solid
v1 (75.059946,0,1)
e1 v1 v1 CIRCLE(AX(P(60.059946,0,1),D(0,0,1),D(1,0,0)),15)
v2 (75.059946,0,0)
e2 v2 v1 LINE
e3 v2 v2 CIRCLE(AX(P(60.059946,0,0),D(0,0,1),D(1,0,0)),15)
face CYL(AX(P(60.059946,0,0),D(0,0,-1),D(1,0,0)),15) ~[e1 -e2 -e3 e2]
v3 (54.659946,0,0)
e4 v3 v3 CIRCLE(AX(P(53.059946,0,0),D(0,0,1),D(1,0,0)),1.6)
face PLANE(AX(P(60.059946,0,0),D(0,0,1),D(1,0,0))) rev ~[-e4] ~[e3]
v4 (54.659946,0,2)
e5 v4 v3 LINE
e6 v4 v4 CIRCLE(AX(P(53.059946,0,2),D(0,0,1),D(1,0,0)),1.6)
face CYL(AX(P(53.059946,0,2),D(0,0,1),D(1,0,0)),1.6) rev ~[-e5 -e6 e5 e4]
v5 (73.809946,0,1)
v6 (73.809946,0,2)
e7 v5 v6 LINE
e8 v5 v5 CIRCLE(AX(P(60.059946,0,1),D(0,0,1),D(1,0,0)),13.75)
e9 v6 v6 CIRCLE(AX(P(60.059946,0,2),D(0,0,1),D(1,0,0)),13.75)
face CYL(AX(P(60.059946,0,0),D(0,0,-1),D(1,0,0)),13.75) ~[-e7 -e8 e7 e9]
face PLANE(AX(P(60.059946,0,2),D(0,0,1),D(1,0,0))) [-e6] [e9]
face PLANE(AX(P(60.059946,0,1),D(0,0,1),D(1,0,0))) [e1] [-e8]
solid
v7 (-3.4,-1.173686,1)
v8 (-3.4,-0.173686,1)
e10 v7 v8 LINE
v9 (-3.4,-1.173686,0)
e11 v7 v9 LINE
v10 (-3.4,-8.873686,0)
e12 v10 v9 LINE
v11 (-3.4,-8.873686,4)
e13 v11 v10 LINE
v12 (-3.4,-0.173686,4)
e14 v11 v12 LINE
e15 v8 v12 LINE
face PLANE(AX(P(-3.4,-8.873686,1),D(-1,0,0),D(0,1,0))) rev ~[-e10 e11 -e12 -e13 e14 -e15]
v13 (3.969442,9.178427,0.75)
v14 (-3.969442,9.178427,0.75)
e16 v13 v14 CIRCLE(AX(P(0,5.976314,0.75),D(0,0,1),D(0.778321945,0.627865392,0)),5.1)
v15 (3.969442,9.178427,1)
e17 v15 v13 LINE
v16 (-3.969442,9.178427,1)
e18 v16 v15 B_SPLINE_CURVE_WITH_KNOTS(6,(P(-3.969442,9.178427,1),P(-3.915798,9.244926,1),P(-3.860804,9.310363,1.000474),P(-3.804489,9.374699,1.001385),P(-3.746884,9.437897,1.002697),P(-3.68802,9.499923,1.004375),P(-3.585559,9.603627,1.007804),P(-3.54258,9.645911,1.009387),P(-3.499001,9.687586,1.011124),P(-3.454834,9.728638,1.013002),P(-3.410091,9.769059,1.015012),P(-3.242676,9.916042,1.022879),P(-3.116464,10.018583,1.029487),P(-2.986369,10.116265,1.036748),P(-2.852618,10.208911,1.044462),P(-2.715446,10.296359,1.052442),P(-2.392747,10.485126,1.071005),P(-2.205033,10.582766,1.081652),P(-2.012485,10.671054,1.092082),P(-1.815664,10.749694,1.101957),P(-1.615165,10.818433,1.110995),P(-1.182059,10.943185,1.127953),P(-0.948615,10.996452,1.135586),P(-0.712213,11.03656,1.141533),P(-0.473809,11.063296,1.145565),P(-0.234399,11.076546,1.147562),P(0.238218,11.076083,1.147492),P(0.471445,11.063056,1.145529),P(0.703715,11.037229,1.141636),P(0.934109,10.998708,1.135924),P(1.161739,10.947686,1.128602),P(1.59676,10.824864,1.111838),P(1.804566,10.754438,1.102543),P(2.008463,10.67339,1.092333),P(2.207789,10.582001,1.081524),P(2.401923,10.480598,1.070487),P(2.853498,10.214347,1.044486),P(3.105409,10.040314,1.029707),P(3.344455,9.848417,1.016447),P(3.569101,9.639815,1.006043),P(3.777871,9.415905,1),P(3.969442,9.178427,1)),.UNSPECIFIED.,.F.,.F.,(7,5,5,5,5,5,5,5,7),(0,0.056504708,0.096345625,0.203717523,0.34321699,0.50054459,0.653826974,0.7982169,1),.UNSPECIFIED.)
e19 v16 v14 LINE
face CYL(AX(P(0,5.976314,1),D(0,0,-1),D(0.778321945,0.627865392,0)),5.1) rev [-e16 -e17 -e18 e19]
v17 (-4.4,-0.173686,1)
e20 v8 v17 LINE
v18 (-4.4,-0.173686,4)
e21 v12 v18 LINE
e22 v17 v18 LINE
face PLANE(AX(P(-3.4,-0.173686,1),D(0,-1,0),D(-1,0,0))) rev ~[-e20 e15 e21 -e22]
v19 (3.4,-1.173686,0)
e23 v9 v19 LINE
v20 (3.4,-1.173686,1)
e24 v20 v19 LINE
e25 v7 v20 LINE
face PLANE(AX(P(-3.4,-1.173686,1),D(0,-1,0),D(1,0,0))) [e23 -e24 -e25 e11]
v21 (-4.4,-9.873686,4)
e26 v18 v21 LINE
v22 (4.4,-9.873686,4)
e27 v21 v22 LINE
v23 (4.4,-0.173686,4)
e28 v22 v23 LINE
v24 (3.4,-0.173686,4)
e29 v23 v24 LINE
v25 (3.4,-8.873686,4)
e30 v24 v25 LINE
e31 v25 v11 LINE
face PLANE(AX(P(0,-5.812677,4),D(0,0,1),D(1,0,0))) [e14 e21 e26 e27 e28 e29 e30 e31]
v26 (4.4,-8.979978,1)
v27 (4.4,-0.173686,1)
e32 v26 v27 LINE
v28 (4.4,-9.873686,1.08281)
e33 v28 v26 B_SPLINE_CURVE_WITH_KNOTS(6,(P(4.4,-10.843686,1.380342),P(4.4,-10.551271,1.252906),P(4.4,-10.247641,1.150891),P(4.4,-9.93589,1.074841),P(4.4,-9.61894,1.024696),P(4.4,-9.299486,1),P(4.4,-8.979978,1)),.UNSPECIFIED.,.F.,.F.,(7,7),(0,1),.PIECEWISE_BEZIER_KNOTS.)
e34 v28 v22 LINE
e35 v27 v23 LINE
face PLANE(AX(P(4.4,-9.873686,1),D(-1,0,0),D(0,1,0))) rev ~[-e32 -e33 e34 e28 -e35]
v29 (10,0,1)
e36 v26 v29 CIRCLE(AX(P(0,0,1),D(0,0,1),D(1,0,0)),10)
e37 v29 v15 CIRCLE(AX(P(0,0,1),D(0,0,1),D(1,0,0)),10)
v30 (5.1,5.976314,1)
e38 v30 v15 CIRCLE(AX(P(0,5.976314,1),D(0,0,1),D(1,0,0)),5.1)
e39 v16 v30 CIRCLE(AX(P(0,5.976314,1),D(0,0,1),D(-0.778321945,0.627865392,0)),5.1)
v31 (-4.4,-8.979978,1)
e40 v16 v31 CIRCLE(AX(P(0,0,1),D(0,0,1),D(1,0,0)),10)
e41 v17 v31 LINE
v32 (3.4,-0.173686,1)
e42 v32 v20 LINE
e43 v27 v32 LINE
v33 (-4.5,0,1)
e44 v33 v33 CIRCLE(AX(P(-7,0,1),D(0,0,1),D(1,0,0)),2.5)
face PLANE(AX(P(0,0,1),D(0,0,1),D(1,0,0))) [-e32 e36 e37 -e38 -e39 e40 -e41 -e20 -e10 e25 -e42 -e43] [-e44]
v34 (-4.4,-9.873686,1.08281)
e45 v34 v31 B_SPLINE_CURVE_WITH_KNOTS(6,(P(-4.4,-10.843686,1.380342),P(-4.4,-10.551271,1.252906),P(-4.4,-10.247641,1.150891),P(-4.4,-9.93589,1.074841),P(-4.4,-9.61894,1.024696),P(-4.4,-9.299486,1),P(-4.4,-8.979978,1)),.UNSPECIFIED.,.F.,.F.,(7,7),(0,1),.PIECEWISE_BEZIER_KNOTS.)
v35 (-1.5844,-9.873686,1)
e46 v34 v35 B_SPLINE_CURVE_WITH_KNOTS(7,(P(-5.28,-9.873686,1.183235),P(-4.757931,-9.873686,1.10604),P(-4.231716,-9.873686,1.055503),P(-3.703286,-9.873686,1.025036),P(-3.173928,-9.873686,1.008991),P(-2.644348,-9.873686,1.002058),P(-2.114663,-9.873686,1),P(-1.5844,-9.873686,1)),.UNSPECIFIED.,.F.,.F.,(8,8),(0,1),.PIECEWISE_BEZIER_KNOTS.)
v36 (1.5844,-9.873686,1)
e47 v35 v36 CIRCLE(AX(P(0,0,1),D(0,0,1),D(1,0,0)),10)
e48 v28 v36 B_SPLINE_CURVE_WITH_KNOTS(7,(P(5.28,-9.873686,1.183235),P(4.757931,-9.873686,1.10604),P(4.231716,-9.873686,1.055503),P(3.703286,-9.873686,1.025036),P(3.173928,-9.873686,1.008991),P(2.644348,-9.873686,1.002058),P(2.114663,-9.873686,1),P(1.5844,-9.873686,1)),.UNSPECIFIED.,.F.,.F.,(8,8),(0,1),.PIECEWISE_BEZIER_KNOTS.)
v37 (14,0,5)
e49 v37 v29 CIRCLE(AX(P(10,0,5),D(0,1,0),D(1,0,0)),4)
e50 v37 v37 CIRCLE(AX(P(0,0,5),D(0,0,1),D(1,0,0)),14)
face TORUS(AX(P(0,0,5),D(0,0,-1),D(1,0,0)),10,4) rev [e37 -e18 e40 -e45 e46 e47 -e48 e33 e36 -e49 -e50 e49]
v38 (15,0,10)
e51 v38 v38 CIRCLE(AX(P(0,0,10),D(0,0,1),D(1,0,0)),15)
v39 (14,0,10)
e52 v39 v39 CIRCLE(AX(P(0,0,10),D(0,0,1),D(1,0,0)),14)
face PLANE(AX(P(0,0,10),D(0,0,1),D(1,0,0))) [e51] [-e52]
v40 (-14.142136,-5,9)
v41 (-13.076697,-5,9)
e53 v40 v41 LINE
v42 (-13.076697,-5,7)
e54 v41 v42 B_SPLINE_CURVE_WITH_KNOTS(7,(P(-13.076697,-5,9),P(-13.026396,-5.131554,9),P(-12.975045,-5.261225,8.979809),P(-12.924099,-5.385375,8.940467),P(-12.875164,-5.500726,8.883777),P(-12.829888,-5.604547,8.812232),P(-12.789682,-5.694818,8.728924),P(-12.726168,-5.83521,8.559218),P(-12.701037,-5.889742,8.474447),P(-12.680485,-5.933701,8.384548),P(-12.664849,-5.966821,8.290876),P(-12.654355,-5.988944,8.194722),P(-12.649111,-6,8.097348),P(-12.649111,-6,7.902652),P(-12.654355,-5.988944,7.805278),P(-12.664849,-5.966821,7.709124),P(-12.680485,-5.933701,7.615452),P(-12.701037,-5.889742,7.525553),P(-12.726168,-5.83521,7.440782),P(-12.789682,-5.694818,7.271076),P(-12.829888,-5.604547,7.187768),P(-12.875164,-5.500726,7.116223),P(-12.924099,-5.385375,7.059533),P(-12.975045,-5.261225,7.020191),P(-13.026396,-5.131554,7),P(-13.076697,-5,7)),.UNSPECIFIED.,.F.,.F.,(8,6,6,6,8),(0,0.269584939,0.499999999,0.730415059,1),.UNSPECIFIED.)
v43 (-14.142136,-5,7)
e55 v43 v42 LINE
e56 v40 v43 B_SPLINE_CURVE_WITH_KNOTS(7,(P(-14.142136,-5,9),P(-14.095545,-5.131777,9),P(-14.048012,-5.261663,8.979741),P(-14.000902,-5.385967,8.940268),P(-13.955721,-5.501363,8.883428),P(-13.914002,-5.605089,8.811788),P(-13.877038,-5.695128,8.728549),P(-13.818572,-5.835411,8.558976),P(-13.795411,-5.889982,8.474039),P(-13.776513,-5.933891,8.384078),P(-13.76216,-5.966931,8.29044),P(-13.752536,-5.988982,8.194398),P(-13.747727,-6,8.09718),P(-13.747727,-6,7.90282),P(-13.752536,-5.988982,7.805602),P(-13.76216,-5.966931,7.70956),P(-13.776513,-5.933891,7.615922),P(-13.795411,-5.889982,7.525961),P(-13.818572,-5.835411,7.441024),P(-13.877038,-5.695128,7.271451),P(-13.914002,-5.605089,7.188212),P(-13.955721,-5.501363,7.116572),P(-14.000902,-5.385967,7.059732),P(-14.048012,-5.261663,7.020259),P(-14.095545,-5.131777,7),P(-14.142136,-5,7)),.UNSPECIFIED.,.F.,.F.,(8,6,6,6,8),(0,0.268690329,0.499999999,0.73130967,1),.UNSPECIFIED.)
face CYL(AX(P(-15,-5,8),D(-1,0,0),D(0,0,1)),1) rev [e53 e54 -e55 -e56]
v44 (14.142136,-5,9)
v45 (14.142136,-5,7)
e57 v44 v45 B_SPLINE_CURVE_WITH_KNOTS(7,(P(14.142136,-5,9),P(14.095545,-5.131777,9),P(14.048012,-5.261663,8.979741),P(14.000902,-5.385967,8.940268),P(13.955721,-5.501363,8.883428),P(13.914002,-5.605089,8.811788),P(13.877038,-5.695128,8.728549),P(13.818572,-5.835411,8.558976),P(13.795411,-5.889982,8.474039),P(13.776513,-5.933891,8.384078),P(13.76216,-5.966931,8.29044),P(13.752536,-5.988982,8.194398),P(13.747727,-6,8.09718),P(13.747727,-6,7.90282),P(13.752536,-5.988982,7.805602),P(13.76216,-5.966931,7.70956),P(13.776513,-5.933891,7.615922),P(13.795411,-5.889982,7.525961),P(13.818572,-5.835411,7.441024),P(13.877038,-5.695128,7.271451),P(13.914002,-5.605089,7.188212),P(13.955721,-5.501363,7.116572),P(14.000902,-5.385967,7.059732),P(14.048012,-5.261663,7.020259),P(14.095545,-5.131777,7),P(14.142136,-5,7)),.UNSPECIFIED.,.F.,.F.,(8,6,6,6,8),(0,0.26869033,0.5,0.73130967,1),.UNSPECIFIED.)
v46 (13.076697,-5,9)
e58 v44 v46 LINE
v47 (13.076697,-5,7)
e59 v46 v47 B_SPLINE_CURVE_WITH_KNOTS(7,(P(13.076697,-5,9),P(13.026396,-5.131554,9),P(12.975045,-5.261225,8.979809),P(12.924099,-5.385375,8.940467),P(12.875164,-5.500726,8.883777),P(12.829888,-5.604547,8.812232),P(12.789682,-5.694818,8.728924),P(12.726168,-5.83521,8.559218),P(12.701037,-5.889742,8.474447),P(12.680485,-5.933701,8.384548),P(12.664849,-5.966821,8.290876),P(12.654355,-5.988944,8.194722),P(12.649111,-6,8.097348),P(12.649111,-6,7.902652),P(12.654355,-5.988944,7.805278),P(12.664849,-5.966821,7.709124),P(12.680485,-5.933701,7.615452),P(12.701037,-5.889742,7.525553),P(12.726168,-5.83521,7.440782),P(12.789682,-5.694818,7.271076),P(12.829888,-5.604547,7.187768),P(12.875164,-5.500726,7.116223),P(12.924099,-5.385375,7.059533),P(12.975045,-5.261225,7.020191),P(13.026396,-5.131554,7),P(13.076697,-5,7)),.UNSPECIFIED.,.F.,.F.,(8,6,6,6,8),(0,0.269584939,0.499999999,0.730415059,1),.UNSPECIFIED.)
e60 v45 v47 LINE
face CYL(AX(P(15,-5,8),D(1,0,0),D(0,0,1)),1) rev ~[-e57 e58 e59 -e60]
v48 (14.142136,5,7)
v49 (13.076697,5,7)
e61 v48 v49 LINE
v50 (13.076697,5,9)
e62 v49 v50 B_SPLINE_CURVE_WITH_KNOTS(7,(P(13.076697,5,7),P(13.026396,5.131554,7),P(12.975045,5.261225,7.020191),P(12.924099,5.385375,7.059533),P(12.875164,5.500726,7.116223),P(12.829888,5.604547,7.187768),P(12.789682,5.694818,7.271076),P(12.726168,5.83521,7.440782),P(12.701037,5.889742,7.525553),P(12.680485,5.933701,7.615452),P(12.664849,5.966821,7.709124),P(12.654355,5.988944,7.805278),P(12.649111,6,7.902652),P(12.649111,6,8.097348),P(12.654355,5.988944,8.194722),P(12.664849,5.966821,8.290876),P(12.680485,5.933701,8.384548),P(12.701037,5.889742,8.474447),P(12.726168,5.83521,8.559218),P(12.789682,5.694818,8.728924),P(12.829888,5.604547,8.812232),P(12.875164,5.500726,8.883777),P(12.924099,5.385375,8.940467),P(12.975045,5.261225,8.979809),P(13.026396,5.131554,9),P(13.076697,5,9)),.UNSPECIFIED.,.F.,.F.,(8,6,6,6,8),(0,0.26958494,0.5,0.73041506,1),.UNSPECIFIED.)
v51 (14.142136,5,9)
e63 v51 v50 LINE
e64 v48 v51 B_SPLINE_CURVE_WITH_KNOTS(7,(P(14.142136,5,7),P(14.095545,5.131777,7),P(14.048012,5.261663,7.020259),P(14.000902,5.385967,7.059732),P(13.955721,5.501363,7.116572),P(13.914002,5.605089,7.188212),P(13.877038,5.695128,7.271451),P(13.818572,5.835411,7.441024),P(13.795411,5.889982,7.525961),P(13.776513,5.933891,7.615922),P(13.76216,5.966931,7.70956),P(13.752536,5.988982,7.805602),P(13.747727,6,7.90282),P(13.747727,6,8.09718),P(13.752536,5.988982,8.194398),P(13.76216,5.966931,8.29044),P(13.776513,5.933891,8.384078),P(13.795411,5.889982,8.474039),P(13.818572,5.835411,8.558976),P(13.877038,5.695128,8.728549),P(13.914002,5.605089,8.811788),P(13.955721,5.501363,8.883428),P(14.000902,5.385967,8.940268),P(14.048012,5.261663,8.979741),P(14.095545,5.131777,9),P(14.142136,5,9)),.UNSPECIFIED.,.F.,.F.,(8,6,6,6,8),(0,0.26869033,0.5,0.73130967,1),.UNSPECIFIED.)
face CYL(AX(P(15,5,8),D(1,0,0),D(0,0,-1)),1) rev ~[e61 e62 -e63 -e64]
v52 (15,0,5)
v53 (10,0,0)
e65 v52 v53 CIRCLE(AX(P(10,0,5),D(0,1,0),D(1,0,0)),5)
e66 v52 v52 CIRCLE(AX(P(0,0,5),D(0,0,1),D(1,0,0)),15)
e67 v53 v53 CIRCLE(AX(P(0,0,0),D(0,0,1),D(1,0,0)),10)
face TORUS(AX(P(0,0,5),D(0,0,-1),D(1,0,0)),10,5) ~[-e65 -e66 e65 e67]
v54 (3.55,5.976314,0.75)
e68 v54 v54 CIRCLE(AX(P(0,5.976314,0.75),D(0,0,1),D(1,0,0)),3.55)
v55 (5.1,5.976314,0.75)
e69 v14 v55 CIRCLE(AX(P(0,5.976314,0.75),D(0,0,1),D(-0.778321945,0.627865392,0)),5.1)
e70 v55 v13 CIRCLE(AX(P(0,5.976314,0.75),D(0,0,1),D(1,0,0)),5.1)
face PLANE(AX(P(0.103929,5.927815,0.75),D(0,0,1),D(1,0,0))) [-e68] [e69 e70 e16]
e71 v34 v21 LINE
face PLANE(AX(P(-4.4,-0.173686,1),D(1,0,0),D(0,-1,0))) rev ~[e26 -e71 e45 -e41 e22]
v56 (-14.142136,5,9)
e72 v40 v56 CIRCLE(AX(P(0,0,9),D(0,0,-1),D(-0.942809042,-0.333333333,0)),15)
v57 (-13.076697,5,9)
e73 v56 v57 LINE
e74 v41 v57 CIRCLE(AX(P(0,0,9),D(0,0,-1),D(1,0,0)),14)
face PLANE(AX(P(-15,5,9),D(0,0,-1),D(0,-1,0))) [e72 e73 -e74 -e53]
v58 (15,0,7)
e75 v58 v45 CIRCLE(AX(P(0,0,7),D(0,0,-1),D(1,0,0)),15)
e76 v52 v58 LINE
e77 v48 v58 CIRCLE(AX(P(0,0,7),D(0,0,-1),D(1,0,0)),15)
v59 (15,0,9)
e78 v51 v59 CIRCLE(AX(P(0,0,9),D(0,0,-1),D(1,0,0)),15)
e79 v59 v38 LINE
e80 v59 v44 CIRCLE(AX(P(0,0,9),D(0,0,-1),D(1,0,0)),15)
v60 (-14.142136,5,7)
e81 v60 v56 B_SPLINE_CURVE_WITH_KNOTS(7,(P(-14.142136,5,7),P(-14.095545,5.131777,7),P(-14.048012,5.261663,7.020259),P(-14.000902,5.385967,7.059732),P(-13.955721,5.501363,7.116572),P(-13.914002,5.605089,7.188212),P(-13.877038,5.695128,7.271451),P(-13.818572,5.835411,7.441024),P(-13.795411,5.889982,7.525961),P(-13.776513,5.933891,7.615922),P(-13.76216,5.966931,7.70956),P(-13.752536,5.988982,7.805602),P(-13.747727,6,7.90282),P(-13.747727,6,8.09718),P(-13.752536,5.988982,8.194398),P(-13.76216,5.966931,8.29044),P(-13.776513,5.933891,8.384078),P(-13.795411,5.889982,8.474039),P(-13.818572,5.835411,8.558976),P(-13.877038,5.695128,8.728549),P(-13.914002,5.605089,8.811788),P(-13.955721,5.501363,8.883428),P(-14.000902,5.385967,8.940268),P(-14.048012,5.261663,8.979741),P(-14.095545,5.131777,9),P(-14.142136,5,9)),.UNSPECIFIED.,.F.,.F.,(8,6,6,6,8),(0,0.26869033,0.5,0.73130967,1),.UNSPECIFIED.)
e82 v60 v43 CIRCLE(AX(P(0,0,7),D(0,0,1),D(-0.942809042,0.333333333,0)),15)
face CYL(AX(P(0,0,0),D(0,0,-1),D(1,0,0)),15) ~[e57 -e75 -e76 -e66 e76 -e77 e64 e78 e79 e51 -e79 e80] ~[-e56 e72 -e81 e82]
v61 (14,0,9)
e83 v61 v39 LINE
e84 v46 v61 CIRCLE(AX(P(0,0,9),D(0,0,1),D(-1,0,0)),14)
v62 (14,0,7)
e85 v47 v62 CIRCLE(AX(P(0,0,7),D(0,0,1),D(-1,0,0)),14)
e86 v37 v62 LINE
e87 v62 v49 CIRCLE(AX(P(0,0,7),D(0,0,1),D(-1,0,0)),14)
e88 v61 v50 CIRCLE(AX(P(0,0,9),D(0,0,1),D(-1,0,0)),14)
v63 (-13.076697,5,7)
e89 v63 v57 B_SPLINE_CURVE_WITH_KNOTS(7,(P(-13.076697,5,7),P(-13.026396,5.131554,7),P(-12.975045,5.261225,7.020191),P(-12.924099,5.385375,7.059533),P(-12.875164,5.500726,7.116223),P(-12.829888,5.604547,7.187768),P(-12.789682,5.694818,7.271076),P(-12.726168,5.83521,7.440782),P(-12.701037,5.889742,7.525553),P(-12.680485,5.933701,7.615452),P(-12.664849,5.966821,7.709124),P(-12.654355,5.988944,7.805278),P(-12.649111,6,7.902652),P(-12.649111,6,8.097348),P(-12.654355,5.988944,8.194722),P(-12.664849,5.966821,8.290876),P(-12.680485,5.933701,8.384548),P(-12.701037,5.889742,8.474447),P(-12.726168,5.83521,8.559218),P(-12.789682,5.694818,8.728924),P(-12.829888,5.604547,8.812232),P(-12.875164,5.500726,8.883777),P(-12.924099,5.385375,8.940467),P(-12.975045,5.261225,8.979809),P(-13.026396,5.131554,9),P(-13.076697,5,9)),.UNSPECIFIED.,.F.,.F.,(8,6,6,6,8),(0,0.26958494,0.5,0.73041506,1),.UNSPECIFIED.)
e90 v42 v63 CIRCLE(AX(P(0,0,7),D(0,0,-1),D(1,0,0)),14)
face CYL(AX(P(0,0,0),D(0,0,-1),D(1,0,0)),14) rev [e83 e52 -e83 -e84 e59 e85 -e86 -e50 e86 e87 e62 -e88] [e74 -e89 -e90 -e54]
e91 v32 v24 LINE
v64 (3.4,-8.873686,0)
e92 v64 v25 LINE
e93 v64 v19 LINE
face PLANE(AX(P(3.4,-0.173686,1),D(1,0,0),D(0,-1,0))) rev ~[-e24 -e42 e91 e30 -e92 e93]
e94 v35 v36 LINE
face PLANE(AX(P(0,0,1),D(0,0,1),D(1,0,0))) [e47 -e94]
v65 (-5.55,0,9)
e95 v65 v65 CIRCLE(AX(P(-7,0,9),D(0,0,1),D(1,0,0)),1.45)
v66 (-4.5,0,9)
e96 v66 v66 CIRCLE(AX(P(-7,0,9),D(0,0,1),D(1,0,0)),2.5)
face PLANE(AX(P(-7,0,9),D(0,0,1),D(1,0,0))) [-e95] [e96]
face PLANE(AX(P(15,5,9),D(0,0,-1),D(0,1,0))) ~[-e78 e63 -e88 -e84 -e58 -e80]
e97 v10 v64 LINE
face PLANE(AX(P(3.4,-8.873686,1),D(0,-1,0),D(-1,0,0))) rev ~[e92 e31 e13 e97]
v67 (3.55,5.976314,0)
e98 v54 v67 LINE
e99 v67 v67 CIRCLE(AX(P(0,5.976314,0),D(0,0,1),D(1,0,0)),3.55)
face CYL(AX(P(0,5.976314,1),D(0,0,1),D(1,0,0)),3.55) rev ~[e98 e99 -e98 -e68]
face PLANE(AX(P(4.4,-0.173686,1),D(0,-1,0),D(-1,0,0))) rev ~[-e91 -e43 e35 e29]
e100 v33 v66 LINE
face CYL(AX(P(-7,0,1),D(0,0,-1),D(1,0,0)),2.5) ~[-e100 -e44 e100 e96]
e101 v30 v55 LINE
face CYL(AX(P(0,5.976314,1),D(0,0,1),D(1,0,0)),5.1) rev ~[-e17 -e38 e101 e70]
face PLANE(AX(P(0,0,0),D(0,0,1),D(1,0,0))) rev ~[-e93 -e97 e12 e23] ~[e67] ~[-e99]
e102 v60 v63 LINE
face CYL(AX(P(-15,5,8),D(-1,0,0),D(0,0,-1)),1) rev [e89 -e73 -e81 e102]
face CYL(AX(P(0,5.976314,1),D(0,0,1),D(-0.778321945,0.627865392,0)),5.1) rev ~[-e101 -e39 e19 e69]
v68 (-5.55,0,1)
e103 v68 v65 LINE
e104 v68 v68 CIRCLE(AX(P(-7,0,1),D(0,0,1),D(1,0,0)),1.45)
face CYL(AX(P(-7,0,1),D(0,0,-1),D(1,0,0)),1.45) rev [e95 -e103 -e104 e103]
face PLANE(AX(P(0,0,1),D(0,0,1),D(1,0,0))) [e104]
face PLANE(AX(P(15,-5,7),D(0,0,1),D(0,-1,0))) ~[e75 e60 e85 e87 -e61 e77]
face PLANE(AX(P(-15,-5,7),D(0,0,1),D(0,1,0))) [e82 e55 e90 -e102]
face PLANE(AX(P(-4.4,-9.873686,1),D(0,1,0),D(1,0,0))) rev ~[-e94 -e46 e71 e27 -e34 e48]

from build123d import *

# Parameters (mm, degrees)
F0_R      = 15
F1_DEPTH  = 10
F2_R      = 5
F3_T      = -1
F4_W      = 6.8
F4_H      = 7.7
F4_R      = 3.55
F5_DEPTH  = 1
F6_DEPTH  = 0.25
F7_DEPTH  = 3
F8_R      = 2.5
F8_R_2    = 1.45
F9_DEPTH  = 8
F12_REACH = 42.1665250606
F13_R     = 13.75
F14_DEPTH = 2
F13_R_2   = 15
F15_DEPTH = 1
F16_R     = 1.6
F17_DEPTH = 2


# Not quite as in the source:
# - a pattern or mirror of a feature is missing from the dataset's text; its kind, count and spacing are read off the source's solid


with BuildPart() as f1:
    # F0 (on Top) → F1 (new body)
    with BuildSketch(Plane.XY):
        Circle(F0_R)
    extrude(amount=F1_DEPTH)

    # F2
    f2_edges = [f1.edges().sort_by_distance(p)[0] for p in [
        (-15, 0, 0),
    ]]
    fillet(f2_edges, radius=F2_R)

    # F3
    f3_openings = [f1.faces().sort_by_distance(p)[0] for p in [
        (0, 0, 10),
    ]]
    offset(amount=F3_T, openings=f3_openings)

    # F4 (on face) → F5 (cut, through all)
    with BuildSketch(Plane.XY.offset(1)):
        with Locations((0, -5.0236860273)):
            Rectangle(F4_W, F4_H)
        with Locations((0, 5.9763139727)):
            Circle(F4_R)
    extrude(amount=-F5_DEPTH, mode=Mode.SUBTRACT)

    # F4 (on face) → F6 (cut, symmetric)
    with BuildSketch(Plane.XY.offset(1)):
        with BuildLine():
            ThreePointArc((-3.9694419174, 9.1784274723), (-1.6979172862, 1.1672520174), (5.1, 5.9763139727))
            ThreePointArc((5.1, 5.9763139727), (4.8090619552, 7.6742312589), (3.9694419174, 9.1784274723))
            ThreePointArc((3.9694419174, 9.1784274723), (0, 10), (-3.9694419174, 9.1784274723))
        make_face()
        with Locations((0, 5.9763139727)):
            Circle(F4_R, mode=Mode.SUBTRACT)
        with BuildLine():
            ThreePointArc((-3.9694419174, 9.1784274723), (0, 10), (3.9694419174, 9.1784274723))
            ThreePointArc((3.9694419174, 9.1784274723), (0, 11.0763139727), (-3.9694419174, 9.1784274723))
        make_face()
    extrude(amount=F6_DEPTH, both=True, mode=Mode.SUBTRACT)

    # F4 (on face) → F7 (join)
    with BuildSketch(Plane.XY.offset(1)):
        with BuildLine():
            Line((-4.4, -0.1736860273), (-4.4, -8.9799777283))
            ThreePointArc((-4.4, -8.9799777283), (-3.0253826694, -9.5313723935), (-1.5844002758, -9.8736860273))
            Line((-1.5844002758, -9.8736860273), (1.5844002758, -9.8736860273))
            ThreePointArc((1.5844002758, -9.8736860273), (3.0253826694, -9.5313723935), (4.4, -8.9799777283))
            Line((4.4, -8.9799777283), (4.4, -0.1736860273))
            Line((4.4, -0.1736860273), (3.4, -0.1736860273))
            Line((3.4, -0.1736860273), (3.4, -1.1736860273))
            Line((3.4, -1.1736860273), (3.4, -8.8736860273))
            Line((3.4, -8.8736860273), (-3.4, -8.8736860273))
            Line((-3.4, -8.8736860273), (-3.4, -1.1736860273))
            Line((-3.4, -1.1736860273), (-3.4, -0.1736860273))
            Line((-3.4, -0.1736860273), (-4.4, -0.1736860273))
        make_face()
        with BuildLine():
            ThreePointArc((-1.5844002758, -9.8736860273), (-3.0253826694, -9.5313723935), (-4.4, -8.9799777283))
            Line((-4.4, -8.9799777283), (-4.4, -9.8736860273))
            Line((-4.4, -9.8736860273), (-1.5844002758, -9.8736860273))
        make_face()
        with BuildLine():
            Line((4.4, -9.8736860273), (4.4, -8.9799777283))
            ThreePointArc((4.4, -8.9799777283), (3.0253826694, -9.5313723935), (1.5844002758, -9.8736860273))
            Line((1.5844002758, -9.8736860273), (4.4, -9.8736860273))
        make_face()
    extrude(amount=F7_DEPTH)

    # F8 (on face) → F9 (join)
    with BuildSketch(Plane.XY.offset(1)):
        with Locations((-7, 0)):
            Circle(F8_R)
        with Locations((-7, 0)):
            Circle(F8_R_2, mode=Mode.SUBTRACT)
    extrude(amount=F9_DEPTH)

    f12_end = f1.faces().sort_by_distance((-14, 0, 7.5))[0]
    # F11 (on offset) → F12 (cut, up to a face of the model that its end follows)
    with BuildSketch(Plane.YZ.offset(-15)):
        with BuildLine():
            Line((-5, 7), (5, 7))
            ThreePointArc((5, 7), (6, 8), (5, 9))
            Line((5, 9), (-5, 9))
            ThreePointArc((-5, 9), (-6, 8), (-5, 7))
        make_face()
    f12_long = extrude(amount=F12_REACH, mode=Mode.PRIVATE)
    f12 = split(f12_long, bisect_by=f12_end, keep=Keep.ALL, mode=Mode.PRIVATE).solids().sort_by_distance((-15, 0, 8))[0]
    add(f12, mode=Mode.SUBTRACT)

    # F12_copies: F12 across plane
    add(f12.mirror(Plane(origin=(0, 0, 0), x_dir=(0, 0, 1), z_dir=(1, 0, 0))), mode=Mode.SUBTRACT)


with BuildPart() as f14:
    # F13 (on Top) → F14 (new body)
    with BuildSketch(Plane.XY):
        with Locations((60.0599460304, 0)):
            Circle(F13_R)
    extrude(amount=F14_DEPTH)

    # F13 (on Top) → F15 (join)
    with BuildSketch(Plane.XY):
        with Locations((60.0599460304, 0)):
            Circle(F13_R_2)
        with Locations((60.0599460304, 0)):
            Circle(F13_R, mode=Mode.SUBTRACT)
    extrude(amount=F15_DEPTH)

    # F16 (on face) → F17 (cut, through all)
    with BuildSketch(Plane.XY.offset(2)):
        with Locations((53.0599460304, 0)):
            Circle(F16_R)
    extrude(amount=-F17_DEPTH, mode=Mode.SUBTRACT)


solid = Compound([f1.part, f14.part])
